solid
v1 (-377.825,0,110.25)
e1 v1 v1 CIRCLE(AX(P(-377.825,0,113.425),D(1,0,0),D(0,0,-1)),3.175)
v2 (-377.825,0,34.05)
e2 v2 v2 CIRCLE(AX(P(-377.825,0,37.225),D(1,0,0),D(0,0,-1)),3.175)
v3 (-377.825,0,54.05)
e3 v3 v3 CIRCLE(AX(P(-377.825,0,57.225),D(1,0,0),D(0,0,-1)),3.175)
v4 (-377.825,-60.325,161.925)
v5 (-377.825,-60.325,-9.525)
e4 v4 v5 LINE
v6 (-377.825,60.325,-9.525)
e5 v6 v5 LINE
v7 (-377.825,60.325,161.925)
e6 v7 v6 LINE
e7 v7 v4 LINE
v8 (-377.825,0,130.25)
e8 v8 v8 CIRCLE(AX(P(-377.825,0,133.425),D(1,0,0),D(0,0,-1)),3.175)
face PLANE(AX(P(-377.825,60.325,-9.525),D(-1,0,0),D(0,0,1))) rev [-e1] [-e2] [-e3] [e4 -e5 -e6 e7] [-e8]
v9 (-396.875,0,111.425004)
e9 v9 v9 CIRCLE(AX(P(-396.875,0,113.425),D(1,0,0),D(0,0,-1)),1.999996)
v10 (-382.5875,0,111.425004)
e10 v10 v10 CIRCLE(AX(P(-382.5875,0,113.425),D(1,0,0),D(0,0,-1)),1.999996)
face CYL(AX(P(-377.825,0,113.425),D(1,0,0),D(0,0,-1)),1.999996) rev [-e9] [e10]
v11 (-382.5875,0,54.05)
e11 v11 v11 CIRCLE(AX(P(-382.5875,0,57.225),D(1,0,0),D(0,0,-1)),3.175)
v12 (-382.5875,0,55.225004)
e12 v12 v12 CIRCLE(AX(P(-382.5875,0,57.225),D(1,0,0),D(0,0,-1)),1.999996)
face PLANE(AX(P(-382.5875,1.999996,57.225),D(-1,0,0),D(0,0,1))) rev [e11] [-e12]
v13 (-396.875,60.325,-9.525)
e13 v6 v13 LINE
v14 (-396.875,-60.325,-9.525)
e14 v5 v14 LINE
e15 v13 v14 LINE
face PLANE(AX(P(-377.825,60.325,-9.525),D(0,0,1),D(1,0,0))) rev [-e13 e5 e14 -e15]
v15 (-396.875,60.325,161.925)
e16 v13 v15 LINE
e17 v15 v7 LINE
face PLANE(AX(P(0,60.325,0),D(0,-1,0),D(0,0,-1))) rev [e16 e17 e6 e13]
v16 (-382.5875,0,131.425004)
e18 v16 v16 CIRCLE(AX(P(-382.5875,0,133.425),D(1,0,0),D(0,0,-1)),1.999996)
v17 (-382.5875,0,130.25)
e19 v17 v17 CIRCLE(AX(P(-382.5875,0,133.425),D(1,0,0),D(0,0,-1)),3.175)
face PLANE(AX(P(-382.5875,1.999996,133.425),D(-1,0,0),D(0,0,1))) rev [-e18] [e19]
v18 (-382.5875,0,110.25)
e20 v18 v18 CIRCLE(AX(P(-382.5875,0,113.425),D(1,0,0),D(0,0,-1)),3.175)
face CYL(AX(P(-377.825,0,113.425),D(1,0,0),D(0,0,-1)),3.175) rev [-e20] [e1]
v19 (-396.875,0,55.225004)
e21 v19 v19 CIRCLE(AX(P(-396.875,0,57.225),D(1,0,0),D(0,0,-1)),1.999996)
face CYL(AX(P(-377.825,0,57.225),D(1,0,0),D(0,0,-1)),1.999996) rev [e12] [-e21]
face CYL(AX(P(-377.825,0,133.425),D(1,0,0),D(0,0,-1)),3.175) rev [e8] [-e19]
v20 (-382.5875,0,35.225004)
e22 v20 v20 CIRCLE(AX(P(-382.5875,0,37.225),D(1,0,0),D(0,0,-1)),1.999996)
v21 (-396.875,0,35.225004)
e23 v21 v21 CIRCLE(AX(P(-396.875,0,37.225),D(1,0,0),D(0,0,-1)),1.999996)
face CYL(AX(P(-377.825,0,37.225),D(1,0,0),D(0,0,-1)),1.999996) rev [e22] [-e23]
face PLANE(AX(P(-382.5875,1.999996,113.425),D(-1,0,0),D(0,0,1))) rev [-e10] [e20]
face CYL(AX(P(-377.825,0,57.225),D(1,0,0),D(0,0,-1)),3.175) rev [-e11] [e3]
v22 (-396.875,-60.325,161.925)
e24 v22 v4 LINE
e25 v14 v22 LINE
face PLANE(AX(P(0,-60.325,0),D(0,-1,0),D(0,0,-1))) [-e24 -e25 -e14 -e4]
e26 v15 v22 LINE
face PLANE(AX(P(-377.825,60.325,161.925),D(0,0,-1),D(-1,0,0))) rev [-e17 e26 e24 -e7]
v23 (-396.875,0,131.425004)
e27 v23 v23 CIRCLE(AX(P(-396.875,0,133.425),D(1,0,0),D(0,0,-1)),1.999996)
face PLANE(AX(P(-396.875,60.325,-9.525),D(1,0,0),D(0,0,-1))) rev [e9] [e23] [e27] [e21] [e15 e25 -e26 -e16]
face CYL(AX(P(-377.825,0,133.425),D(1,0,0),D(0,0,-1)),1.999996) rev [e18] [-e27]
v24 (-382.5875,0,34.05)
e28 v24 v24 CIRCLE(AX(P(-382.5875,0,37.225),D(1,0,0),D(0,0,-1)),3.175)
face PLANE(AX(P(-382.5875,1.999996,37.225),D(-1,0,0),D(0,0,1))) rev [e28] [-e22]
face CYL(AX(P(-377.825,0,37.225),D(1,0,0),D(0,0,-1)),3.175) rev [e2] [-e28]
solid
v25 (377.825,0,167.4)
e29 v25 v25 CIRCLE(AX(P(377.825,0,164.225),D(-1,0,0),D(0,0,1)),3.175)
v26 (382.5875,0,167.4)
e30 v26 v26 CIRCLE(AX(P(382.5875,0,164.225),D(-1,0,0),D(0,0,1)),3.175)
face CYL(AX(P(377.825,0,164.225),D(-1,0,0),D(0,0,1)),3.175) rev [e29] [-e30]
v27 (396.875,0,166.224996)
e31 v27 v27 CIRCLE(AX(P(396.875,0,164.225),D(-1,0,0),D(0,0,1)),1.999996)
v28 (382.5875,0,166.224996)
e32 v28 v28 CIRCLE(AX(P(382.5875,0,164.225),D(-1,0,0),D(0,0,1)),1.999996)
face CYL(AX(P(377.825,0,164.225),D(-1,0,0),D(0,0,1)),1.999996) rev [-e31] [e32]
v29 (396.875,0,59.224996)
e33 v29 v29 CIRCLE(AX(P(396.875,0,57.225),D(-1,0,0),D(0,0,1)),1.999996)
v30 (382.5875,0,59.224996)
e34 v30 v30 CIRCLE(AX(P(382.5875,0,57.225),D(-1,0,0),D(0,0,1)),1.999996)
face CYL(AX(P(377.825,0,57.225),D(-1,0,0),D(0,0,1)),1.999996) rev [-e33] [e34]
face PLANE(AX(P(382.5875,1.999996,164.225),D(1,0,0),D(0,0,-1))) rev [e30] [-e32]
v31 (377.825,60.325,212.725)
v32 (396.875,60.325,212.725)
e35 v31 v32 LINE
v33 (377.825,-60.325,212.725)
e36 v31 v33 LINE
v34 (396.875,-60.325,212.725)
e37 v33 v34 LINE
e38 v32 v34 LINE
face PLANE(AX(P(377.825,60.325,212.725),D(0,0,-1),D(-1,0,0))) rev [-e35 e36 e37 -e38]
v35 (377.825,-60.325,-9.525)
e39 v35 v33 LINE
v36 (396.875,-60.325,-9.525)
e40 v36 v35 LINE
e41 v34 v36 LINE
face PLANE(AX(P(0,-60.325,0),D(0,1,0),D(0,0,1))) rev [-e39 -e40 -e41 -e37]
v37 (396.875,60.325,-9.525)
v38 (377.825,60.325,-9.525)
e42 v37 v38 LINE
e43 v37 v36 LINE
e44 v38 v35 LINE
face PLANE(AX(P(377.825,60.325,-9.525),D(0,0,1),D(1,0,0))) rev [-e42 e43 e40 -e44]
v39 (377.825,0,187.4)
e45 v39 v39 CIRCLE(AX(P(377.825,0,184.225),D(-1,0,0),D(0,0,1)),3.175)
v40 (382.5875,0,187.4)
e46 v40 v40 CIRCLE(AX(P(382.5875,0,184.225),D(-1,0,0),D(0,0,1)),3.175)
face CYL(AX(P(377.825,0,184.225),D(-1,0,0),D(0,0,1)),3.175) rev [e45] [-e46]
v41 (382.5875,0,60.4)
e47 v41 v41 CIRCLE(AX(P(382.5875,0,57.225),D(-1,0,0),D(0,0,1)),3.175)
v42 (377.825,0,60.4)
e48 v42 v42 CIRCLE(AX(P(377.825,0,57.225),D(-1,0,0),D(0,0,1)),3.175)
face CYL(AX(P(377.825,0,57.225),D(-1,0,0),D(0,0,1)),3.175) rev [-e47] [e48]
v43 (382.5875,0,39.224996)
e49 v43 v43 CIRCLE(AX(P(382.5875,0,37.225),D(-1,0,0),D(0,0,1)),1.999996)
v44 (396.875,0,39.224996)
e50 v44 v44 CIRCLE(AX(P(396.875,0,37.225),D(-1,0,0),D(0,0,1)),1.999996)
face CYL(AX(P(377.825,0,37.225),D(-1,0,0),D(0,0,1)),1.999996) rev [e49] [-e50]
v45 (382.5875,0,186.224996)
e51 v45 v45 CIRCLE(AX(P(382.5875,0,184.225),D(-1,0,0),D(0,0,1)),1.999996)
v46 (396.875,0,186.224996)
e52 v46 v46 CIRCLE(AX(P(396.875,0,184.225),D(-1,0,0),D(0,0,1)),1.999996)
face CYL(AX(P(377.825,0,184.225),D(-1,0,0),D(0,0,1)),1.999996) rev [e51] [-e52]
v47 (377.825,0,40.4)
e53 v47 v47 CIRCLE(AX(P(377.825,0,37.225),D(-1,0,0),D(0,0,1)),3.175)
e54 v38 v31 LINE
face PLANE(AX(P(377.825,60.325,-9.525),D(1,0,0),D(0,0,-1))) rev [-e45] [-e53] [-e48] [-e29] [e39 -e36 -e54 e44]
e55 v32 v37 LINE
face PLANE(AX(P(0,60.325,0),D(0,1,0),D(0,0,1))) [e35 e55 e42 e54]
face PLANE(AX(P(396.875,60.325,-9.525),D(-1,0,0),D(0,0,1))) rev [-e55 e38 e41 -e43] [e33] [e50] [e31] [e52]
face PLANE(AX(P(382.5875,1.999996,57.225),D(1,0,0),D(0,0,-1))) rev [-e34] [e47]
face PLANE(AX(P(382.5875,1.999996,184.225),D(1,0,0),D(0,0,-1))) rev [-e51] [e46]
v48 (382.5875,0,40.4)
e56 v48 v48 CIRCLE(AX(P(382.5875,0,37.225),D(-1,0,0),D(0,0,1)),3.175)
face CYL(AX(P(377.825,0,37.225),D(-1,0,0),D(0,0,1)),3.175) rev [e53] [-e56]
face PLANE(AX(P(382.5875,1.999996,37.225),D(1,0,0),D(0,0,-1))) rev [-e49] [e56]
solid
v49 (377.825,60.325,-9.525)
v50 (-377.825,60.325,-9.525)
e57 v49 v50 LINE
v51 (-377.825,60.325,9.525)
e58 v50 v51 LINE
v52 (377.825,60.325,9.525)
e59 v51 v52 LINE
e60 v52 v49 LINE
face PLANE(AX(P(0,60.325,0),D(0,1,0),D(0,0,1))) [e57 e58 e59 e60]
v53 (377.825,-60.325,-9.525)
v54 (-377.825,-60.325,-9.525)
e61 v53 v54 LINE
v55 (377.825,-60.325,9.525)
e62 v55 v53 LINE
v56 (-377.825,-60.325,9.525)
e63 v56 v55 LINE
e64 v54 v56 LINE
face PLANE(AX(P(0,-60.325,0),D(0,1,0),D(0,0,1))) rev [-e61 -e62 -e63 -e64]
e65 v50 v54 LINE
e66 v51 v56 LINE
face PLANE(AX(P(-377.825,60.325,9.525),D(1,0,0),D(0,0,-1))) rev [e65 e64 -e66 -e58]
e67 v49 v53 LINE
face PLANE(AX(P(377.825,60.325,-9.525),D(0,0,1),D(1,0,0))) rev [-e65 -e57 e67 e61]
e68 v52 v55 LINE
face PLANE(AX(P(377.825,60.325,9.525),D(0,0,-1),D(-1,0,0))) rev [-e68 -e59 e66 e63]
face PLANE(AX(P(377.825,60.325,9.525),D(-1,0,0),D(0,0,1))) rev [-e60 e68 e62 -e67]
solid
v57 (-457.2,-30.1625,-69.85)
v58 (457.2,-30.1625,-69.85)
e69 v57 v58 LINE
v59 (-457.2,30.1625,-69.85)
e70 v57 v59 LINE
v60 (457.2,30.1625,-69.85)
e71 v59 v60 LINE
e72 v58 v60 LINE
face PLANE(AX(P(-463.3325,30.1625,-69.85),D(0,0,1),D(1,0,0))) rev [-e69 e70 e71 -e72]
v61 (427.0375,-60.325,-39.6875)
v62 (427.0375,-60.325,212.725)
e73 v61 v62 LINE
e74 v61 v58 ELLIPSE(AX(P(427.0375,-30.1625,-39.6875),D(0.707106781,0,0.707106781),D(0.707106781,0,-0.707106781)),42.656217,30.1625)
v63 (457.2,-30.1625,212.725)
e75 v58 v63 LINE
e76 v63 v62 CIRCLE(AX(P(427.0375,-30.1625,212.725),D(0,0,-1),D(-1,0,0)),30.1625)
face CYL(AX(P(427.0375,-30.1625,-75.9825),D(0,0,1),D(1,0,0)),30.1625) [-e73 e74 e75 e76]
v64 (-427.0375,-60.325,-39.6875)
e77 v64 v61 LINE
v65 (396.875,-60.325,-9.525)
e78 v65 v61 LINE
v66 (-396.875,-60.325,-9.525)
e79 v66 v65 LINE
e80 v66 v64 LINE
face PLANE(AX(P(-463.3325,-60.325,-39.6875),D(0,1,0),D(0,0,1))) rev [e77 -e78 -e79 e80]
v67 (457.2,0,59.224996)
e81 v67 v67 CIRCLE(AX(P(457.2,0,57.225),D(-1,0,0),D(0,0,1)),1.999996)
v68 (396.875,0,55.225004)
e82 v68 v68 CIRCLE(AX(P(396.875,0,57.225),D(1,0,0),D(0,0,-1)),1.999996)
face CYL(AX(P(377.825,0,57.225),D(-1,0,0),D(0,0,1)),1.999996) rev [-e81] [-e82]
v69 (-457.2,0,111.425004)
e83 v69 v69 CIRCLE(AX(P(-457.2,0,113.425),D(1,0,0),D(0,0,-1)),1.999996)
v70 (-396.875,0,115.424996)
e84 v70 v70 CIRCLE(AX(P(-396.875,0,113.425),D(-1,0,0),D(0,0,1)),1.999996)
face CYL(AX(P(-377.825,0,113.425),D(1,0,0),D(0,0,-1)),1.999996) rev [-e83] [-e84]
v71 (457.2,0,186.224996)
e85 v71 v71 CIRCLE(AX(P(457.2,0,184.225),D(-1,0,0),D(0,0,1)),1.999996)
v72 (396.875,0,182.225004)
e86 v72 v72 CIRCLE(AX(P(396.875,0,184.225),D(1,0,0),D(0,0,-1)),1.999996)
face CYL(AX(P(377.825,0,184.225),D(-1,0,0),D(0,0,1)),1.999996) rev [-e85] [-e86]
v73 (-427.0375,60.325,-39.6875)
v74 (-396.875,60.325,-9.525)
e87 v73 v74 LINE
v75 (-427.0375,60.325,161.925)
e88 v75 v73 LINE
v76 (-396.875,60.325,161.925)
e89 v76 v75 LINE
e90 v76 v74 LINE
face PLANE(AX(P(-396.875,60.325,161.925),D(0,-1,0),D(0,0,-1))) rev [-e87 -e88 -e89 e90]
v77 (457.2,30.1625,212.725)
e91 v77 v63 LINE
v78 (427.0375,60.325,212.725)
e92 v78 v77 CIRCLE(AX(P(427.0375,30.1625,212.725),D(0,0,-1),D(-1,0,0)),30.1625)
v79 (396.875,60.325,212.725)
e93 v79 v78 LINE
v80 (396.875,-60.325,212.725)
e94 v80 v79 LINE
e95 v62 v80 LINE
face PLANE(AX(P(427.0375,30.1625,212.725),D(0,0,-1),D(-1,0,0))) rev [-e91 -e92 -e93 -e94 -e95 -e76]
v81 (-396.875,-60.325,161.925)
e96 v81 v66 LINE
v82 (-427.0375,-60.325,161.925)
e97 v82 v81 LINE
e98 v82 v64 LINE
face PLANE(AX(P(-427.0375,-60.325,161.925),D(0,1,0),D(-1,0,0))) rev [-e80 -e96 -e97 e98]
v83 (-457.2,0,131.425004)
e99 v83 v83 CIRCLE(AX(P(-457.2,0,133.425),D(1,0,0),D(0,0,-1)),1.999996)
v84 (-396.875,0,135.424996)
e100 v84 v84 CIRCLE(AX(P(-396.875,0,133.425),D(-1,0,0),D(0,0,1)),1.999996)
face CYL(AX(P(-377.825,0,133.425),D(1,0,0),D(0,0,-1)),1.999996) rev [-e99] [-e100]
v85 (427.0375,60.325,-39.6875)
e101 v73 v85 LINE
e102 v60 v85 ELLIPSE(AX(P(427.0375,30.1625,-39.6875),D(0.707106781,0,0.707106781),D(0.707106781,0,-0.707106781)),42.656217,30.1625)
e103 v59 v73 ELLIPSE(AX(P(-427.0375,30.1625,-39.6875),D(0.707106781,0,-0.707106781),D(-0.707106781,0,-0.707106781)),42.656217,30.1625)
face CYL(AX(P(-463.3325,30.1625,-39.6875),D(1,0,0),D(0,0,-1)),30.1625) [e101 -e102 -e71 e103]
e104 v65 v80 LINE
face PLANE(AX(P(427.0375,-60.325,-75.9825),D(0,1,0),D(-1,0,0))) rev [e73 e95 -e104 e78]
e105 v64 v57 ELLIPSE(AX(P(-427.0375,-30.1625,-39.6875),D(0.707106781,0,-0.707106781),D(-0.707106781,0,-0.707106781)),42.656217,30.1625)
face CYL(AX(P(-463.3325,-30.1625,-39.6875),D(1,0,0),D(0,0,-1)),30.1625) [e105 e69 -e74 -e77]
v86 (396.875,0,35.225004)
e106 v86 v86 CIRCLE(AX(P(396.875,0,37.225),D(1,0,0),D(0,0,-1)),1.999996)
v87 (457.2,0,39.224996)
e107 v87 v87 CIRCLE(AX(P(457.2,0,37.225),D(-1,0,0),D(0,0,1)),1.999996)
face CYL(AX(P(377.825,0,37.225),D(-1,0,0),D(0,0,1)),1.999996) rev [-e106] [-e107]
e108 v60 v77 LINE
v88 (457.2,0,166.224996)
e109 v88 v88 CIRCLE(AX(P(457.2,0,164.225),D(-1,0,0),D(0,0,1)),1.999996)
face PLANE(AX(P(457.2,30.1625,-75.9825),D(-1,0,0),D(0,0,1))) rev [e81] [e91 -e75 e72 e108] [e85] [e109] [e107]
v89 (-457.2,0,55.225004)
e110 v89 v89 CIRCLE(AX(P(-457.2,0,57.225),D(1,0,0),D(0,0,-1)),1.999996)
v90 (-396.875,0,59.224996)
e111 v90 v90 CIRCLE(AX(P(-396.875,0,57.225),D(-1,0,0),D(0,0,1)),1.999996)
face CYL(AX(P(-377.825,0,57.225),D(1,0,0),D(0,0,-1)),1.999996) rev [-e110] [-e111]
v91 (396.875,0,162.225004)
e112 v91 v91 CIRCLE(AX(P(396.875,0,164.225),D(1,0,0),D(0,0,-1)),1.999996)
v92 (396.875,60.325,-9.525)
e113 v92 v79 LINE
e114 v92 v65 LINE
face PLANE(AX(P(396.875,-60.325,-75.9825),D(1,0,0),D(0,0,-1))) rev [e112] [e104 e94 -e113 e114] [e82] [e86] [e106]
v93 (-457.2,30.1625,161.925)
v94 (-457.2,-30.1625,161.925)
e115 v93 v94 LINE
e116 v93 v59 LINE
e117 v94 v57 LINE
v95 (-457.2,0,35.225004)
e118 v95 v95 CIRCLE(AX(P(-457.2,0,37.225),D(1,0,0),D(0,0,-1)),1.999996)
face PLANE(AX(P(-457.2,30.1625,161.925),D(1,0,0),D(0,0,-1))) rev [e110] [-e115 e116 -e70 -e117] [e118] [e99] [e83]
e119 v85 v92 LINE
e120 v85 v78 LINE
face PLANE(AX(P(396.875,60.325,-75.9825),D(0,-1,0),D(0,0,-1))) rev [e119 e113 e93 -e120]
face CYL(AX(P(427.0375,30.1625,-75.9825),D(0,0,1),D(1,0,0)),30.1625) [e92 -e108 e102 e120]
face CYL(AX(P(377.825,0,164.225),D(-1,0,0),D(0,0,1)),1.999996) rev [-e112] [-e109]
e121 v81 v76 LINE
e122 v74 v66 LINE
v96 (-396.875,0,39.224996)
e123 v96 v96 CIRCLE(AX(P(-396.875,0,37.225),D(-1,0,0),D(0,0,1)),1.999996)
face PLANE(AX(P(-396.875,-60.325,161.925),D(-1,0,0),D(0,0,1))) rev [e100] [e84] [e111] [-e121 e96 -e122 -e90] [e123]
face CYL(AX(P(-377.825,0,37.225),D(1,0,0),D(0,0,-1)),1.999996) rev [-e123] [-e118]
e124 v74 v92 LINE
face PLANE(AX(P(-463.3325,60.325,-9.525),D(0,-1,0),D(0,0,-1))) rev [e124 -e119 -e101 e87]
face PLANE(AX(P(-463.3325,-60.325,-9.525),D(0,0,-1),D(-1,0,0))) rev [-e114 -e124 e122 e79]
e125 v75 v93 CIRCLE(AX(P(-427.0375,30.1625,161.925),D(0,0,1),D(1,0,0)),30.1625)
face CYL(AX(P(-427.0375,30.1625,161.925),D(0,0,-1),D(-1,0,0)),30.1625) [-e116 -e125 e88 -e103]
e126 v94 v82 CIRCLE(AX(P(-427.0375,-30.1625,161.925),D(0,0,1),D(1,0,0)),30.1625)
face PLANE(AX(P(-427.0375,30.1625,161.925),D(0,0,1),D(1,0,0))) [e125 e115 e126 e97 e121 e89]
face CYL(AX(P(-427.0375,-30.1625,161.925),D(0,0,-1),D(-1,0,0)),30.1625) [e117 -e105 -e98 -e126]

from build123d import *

# Parameters (mm, degrees)
SKETCH1_W                                     = 755.65
SKETCH1_H                                     = 19.05
BOSS_EXTRUDE1_DEPTH                           = 60.325
SKETCH2_W                                     = 19.05
SKETCH2_H                                     = 171.45
BOSS_EXTRUDE2_DEPTH                           = 60.325
SKETCH2_H_2                                   = 222.25
BOSS_EXTRUDE2_2_DEPTH                         = 60.325
CBORE_START                                   = -457.2
CBORE_FOR_0_BINDING_HEAD_MACHINE_SC_2_R       = 1.999996
CBORE_FOR_0_BINDING_HEAD_MACHINE_SCREW1_DEPTH = 914.4
CBORE_FOR_0_BINDING_HEAD_MACHINE_SC_3_O_R     = 1.999996
CBORE_FOR_0_BINDING_HEAD_MACHINE_SC_3_DEPTH   = 79.375
CBORE_START_2                                 = -382.5875
CBORE_FOR_0_BINDING_HEAD_MACHINE_SC_4_O_R     = 3.175
CBORE_FOR_0_BINDING_HEAD_MACHINE_SC_4_O_R_2   = 1.999996
CBORE_FOR_0_BINDING_HEAD_MACHINE_SC_4_DEPTH   = 765.175
CBORE_FOR_0_BINDING_HEAD_MACHINE_SC_5_O_R     = 3.175
CBORE_FOR_0_BINDING_HEAD_MACHINE_SC_5_O_R_2   = 1.999996
CBORE_FOR_0_BINDING_HEAD_MACHINE_SC_5_DEPTH   = 4.7625
CBORE_START_3                                 = 377.825
CBORE_FOR_0_BINDING_HEAD_MACHINE_SC_6_O_R     = 3.175
CBORE_FOR_0_BINDING_HEAD_MACHINE_SC_6_O_R_2   = 1.999996
CBORE_FOR_0_BINDING_HEAD_MACHINE_SC_6_DEPTH   = 4.7625


# Read off the part's stored shape, not the designer's step: CBORE for #0 Binding Head Machine Screw1
with BuildPart() as part:
    # Sketch1 → Boss-Extrude1 (new, symmetric)
    with BuildSketch(Plane(origin=(0, 0, 0), x_dir=(1, 0, 0), z_dir=(0, 1, 0))):
        Rectangle(SKETCH1_W, SKETCH1_H)
    extrude(amount=BOSS_EXTRUDE1_DEPTH, both=True)


with BuildPart() as body_2:
    # Sketch2 → Boss-Extrude2 (new, symmetric)
    with BuildSketch(Plane(origin=(0, 0, 0), x_dir=(1, 0, 0), z_dir=(0, 1, 0))):
        with Locations((-387.35, -76.2)):
            Rectangle(SKETCH2_W, SKETCH2_H)
    extrude(amount=BOSS_EXTRUDE2_DEPTH, both=True)


with BuildPart() as body_3:
    # Sketch2 → Boss-Extrude2 2 (new, symmetric)
    with BuildSketch(Plane(origin=(0, 0, 0), x_dir=(1, 0, 0), z_dir=(0, 1, 0))):
        with Locations((387.35, -101.6)):
            Rectangle(SKETCH2_W, SKETCH2_H_2)
    extrude(amount=BOSS_EXTRUDE2_2_DEPTH, both=True)


with BuildPart() as body_4:
    # Sweep1: sweep along a path in Sketch4
    with BuildLine(Plane(origin=(0, 0, 0), x_dir=(1, 0, 0), z_dir=(0, 1, 0))) as sweep1_path:
        Line((-396.875, -161.925), (-396.875, 9.525))
        Line((-396.875, 9.525), (396.875, 9.525))
        Line((396.875, 9.525), (396.875, -212.725))
    # Sketch3 → Sweep1 (sweep)
    with BuildSketch(Plane.XY.offset(161.925)):
        with BuildLine():
            Line((-396.875, 60.325), (-427.0375, 60.325))
            ThreePointArc((-427.0375, 60.325), (-448.365608288, 51.490608288), (-457.2, 30.1625))
            Line((-457.2, 30.1625), (-457.2, -30.1625))
            ThreePointArc((-457.2, -30.1625), (-448.365608288, -51.490608288), (-427.0375, -60.325))
            Line((-427.0375, -60.325), (-396.875, -60.325))
            Line((-396.875, -60.325), (-396.875, 60.325))
        make_face()
    sweep(path=sweep1_path.line, transition=Transition.RIGHT)


with BuildPart() as cbore_for_0_binding_head_machine_screw1_tool:
    # CBORE for _0 Binding Head Machine Sc 2 → CBORE for #0 Binding Head Machine Screw1 (new body)
    with BuildSketch(Plane.YZ.offset(CBORE_START)):
        with Locations((0, 184.225)):
            Circle(CBORE_FOR_0_BINDING_HEAD_MACHINE_SC_2_R)
        with Locations((0, 164.225)):
            Circle(CBORE_FOR_0_BINDING_HEAD_MACHINE_SC_2_R)
        with Locations((0, 57.225)):
            Circle(CBORE_FOR_0_BINDING_HEAD_MACHINE_SC_2_R)
        with Locations((0, 37.225)):
            Circle(CBORE_FOR_0_BINDING_HEAD_MACHINE_SC_2_R)
    extrude(amount=CBORE_FOR_0_BINDING_HEAD_MACHINE_SCREW1_DEPTH)


with BuildPart() as body_2_1:
    add(body_2.part)

    # CBORE for #0 Binding Head Machine Screw1: cut by cbore_for_0_binding_head_machine_screw1_tool
    add(cbore_for_0_binding_head_machine_screw1_tool.part, mode=Mode.SUBTRACT)


with BuildPart() as body_3_1:
    add(body_3.part)

    # CBORE for #0 Binding Head Machine Screw1: cut by cbore_for_0_binding_head_machine_screw1_tool
    add(cbore_for_0_binding_head_machine_screw1_tool.part, mode=Mode.SUBTRACT)


with BuildPart() as body_4_1:
    add(body_4.part)

    # CBORE for #0 Binding Head Machine Screw1: cut by cbore_for_0_binding_head_machine_screw1_tool
    add(cbore_for_0_binding_head_machine_screw1_tool.part, mode=Mode.SUBTRACT)


with BuildPart() as cbore_for_0_binding_head_machine_sc_3_tool:
    # CBORE for _0 Binding Head Machine Sc 3 o → CBORE for _0 Binding Head Machine Sc 3 (new body)
    with BuildSketch(Plane.YZ.offset(CBORE_START)):
        with Locations((0, 133.425)):
            Circle(CBORE_FOR_0_BINDING_HEAD_MACHINE_SC_3_O_R)
        with Locations((0, 113.425)):
            Circle(CBORE_FOR_0_BINDING_HEAD_MACHINE_SC_3_O_R)
    extrude(amount=CBORE_FOR_0_BINDING_HEAD_MACHINE_SC_3_DEPTH)


with BuildPart() as body_2_2:
    add(body_2_1.part)

    # CBORE for _0 Binding Head Machine Sc 3: cut by cbore_for_0_binding_head_machine_sc_3_tool
    add(cbore_for_0_binding_head_machine_sc_3_tool.part, mode=Mode.SUBTRACT)


with BuildPart() as body_4_2:
    add(body_4_1.part)

    # CBORE for _0 Binding Head Machine Sc 3: cut by cbore_for_0_binding_head_machine_sc_3_tool
    add(cbore_for_0_binding_head_machine_sc_3_tool.part, mode=Mode.SUBTRACT)


with BuildPart() as cbore_for_0_binding_head_machine_sc_4_tool:
    # CBORE for _0 Binding Head Machine Sc 4 o → CBORE for _0 Binding Head Machine Sc 4 (new body)
    # profile 1 of 3: a face of its own
    with BuildSketch(Plane.YZ.offset(CBORE_START_2)):
        with Locations((0, 184.225)):
            Circle(CBORE_FOR_0_BINDING_HEAD_MACHINE_SC_4_O_R)
        with Locations((0, 184.225)):
            Circle(CBORE_FOR_0_BINDING_HEAD_MACHINE_SC_4_O_R_2, mode=Mode.SUBTRACT)
    # profile 2 of 3: a face of its own
    with BuildSketch(Plane.YZ.offset(CBORE_START_2)):
        with Locations((0, 57.225)):
            Circle(CBORE_FOR_0_BINDING_HEAD_MACHINE_SC_4_O_R)
        with Locations((0, 57.225)):
            Circle(CBORE_FOR_0_BINDING_HEAD_MACHINE_SC_4_O_R_2, mode=Mode.SUBTRACT)
    # profile 3 of 3: a face of its own
    with BuildSketch(Plane.YZ.offset(CBORE_START_2)):
        with Locations((0, 37.225)):
            Circle(CBORE_FOR_0_BINDING_HEAD_MACHINE_SC_4_O_R)
        with Locations((0, 37.225)):
            Circle(CBORE_FOR_0_BINDING_HEAD_MACHINE_SC_4_O_R_2, mode=Mode.SUBTRACT)
    extrude(amount=CBORE_FOR_0_BINDING_HEAD_MACHINE_SC_4_DEPTH)


with BuildPart() as body_2_3:
    add(body_2_2.part)

    # CBORE for _0 Binding Head Machine Sc 4: cut by cbore_for_0_binding_head_machine_sc_4_tool
    add(cbore_for_0_binding_head_machine_sc_4_tool.part, mode=Mode.SUBTRACT)

    # CBORE for _0 Binding Head Machine Sc 5 o → CBORE for _0 Binding Head Machine Sc 5 (cut)
    # profile 1 of 2: a face of its own
    with BuildSketch(Plane.YZ.offset(CBORE_START_2)):
        with Locations((0, 133.425)):
            Circle(CBORE_FOR_0_BINDING_HEAD_MACHINE_SC_5_O_R)
        with Locations((0, 133.425)):
            Circle(CBORE_FOR_0_BINDING_HEAD_MACHINE_SC_5_O_R_2, mode=Mode.SUBTRACT)
    # profile 2 of 2: a face of its own
    with BuildSketch(Plane.YZ.offset(CBORE_START_2)):
        with Locations((0, 113.425)):
            Circle(CBORE_FOR_0_BINDING_HEAD_MACHINE_SC_5_O_R)
        with Locations((0, 113.425)):
            Circle(CBORE_FOR_0_BINDING_HEAD_MACHINE_SC_5_O_R_2, mode=Mode.SUBTRACT)
    extrude(amount=CBORE_FOR_0_BINDING_HEAD_MACHINE_SC_5_DEPTH, mode=Mode.SUBTRACT)


with BuildPart() as body_3_2:
    add(body_3_1.part)

    # CBORE for _0 Binding Head Machine Sc 4: cut by cbore_for_0_binding_head_machine_sc_4_tool
    add(cbore_for_0_binding_head_machine_sc_4_tool.part, mode=Mode.SUBTRACT)

    # CBORE for _0 Binding Head Machine Sc 6 o → CBORE for _0 Binding Head Machine Sc 6 (cut)
    with BuildSketch(Plane.YZ.offset(CBORE_START_3)):
        with Locations((0, 164.225)):
            Circle(CBORE_FOR_0_BINDING_HEAD_MACHINE_SC_6_O_R)
        with Locations((0, 164.225)):
            Circle(CBORE_FOR_0_BINDING_HEAD_MACHINE_SC_6_O_R_2, mode=Mode.SUBTRACT)
    extrude(amount=CBORE_FOR_0_BINDING_HEAD_MACHINE_SC_6_DEPTH, mode=Mode.SUBTRACT)


solid = Compound([part.part, body_4_2.part, body_2_3.part, body_3_2.part])
